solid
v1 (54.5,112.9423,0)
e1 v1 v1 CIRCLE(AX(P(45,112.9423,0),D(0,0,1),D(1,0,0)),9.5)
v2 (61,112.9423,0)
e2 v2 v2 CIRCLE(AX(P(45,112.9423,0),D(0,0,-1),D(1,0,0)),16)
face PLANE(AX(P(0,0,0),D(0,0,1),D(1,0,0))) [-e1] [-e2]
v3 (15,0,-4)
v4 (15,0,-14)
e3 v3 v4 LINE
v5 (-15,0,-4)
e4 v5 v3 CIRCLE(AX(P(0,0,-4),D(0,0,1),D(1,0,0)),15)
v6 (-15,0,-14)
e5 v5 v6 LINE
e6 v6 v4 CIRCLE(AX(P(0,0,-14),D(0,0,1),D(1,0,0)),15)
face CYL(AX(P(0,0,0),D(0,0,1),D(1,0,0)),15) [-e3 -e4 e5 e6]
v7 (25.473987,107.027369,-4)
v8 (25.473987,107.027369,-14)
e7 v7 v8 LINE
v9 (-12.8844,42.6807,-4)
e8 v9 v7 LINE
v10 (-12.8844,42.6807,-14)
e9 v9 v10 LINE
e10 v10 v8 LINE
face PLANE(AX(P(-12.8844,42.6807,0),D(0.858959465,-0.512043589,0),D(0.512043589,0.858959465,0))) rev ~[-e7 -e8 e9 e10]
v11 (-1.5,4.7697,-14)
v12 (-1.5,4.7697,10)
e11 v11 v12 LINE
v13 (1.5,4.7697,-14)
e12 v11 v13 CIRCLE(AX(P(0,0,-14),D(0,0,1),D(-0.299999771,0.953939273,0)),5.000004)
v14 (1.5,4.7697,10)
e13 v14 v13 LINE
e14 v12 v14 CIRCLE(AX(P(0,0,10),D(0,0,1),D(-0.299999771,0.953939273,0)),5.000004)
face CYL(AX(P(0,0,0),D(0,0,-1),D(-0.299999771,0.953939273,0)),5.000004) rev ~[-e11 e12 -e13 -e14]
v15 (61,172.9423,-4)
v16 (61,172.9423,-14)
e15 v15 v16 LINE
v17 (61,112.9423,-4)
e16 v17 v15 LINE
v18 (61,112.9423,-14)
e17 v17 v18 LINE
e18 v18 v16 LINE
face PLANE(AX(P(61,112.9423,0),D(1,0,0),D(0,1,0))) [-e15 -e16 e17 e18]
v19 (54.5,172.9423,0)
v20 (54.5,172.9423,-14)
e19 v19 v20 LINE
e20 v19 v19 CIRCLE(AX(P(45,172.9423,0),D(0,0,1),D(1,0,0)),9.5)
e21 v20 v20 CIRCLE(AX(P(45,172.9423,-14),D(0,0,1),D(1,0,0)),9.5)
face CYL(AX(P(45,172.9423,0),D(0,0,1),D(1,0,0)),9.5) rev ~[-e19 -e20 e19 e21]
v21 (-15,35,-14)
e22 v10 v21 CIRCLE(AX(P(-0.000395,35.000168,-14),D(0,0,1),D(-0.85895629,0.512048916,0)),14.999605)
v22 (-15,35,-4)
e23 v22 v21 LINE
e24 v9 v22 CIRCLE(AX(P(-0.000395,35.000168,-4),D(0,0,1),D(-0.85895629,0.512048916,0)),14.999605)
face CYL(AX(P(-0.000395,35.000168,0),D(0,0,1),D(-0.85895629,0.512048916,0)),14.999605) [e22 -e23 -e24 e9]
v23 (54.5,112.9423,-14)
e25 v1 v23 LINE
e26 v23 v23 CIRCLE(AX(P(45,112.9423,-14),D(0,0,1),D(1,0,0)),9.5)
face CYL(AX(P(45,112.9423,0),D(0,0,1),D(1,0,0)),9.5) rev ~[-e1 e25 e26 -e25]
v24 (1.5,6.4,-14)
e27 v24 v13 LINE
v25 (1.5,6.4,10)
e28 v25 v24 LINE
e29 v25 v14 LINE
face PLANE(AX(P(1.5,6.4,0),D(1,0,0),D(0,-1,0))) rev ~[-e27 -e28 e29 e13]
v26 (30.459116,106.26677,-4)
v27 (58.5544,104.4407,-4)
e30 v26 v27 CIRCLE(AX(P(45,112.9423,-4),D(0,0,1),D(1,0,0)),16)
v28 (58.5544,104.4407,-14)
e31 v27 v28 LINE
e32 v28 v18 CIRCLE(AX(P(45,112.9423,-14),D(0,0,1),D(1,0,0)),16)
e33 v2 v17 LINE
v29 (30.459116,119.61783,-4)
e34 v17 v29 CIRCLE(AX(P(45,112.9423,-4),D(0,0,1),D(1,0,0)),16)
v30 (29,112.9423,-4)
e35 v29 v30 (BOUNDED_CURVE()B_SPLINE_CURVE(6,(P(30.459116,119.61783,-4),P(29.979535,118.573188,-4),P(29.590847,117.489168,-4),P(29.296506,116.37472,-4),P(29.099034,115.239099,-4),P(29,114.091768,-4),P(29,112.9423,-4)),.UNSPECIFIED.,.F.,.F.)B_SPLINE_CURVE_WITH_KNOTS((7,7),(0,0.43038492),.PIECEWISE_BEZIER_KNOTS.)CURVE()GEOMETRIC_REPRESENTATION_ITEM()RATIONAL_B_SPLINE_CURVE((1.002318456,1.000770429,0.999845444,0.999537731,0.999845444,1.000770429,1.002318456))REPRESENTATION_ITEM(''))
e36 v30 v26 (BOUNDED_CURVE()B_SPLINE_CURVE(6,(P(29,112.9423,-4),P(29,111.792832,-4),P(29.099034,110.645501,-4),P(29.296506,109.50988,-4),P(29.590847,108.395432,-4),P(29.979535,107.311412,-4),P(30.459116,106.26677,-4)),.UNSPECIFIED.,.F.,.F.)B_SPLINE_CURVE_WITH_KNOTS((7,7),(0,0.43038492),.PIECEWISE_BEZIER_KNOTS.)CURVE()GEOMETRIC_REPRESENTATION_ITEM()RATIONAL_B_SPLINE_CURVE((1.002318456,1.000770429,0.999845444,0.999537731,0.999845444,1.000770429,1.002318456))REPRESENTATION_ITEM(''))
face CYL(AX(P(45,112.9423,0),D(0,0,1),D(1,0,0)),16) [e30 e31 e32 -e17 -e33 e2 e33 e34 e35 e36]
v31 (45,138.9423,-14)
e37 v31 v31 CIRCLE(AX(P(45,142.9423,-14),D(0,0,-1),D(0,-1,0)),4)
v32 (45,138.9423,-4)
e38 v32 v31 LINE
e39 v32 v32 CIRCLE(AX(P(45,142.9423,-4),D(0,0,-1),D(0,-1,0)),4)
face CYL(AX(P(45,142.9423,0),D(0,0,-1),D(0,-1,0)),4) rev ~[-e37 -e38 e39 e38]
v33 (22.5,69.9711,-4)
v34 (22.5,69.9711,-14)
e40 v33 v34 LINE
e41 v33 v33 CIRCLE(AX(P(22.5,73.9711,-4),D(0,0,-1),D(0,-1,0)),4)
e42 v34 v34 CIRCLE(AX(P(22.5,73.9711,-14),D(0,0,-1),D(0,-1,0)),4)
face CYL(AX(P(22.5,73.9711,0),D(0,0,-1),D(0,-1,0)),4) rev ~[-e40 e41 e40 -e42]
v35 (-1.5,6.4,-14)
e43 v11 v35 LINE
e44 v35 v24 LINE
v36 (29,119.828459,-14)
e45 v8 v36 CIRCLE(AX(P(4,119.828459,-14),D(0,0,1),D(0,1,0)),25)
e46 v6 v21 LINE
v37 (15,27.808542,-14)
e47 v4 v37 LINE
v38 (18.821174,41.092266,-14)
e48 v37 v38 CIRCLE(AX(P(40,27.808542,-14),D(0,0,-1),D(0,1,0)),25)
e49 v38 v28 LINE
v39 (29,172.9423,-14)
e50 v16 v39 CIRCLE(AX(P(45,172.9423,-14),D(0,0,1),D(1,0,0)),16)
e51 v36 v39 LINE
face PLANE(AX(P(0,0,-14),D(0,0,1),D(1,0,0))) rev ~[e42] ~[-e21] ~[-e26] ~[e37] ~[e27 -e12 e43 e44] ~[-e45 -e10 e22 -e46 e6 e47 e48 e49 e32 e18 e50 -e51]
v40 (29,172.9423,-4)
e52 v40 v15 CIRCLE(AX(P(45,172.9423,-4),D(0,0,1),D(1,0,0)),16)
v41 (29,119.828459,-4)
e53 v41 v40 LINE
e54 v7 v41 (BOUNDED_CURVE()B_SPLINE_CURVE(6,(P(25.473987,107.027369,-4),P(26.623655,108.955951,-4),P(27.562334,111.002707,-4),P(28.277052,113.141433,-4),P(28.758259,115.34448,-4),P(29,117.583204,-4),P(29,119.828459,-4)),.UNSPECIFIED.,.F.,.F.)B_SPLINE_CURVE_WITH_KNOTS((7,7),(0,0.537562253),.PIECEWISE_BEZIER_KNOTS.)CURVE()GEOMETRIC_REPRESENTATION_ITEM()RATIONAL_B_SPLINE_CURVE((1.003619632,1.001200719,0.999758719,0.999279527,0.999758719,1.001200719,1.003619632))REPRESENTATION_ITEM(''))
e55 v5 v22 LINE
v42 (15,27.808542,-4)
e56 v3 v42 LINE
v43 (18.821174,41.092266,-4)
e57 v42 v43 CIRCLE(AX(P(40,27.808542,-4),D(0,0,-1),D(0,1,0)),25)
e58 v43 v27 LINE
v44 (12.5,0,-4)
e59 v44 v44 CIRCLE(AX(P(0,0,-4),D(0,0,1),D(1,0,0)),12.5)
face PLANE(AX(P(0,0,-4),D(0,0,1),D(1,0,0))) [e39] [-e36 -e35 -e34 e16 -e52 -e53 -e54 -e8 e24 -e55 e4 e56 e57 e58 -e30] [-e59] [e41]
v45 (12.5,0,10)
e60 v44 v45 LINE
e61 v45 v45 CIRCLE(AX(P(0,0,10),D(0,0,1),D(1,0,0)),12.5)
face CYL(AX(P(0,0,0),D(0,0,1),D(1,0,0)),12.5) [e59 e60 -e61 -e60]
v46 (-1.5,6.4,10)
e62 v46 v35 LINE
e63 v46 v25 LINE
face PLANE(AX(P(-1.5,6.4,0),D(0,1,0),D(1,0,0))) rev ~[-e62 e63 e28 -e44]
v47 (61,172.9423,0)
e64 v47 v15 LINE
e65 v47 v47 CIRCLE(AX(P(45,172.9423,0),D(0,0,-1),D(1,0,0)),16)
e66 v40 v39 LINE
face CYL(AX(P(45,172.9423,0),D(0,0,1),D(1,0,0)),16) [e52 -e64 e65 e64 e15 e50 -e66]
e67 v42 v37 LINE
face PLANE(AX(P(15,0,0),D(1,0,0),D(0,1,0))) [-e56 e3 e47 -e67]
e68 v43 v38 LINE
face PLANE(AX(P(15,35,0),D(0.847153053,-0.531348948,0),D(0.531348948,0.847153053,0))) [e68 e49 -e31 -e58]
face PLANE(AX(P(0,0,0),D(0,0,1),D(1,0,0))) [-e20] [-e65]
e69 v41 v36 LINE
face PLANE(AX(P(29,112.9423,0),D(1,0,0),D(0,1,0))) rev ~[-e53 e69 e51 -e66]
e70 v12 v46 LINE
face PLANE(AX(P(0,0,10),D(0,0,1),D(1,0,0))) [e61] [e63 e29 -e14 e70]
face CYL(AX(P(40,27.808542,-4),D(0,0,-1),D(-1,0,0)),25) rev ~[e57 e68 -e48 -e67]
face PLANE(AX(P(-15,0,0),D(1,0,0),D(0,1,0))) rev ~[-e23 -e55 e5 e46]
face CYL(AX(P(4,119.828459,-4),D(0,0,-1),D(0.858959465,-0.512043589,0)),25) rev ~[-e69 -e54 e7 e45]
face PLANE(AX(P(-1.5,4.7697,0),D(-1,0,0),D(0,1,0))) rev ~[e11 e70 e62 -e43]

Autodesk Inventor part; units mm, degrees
ref_plane "YZ Plane" through (0, 0, 0) normal (1, 0, 0) x (0, 1, 0)
ref_plane "XZ Plane" through (0, 0, 0) normal (0, 1, 0) x (-1, 0, 0)
sketch "Skizze1" plane through (0, 0, 0) normal (0, 0, 1) x (1, 0, 0)
  arc A0 (-1.5, 4.7697) -> (1.5, 4.7697) centre (0, 0) ccw
  circle A1 centre (0, 0) radius 12.5
  line L0 (-30.9429, 0) -> (77.0229, 0) construction
  circle A2 centre (0, 0) radius 15
  circle A3 centre (45, 112.9423) radius 16
  line L1 (61, 112.9423) -> (61, 172.9423)
  line L2 (29, 112.9423) -> (29, 172.9423)
  line L3 (45, 112.9423) -> (45, 188.9423) construction
  line L4 (45, 112.9423) -> (45, 128.9423) construction
  line L5 (29, 112.9423) -> (61, 112.9423) construction
  line L6 (-15, 0) -> (-15, 35)
  line L7 (15, 0) -> (15, 35)
  line L8 (-15, 35) -> (15, 35) construction
  circle A4 centre (0, 35) radius 15 construction
  line L9 (-12.8844, 42.6807) -> (29, 112.9423)
  arc A5 (-12.8844, 42.6807) -> (-15, 35) centre (0, 35) ccw
  line L10 (15, 35) -> (58.5544, 104.4407)
  arc A6 (58.5544, 104.4407) -> (61, 112.9423) centre (45, 112.9423) ccw
  line L11 (0, 35) -> (45, 112.9423) construction
  circle A7 centre (45, 172.9423) radius 16
  circle A8 centre (45, 172.9423) radius 9.5
  circle A9 centre (45, 112.9423) radius 9.5
  line L12 (-1.5, 6.4) -> (1.5, 6.4)
  line L13 (1.5, 6.4) -> (1.5, 4.7697)
  line L14 (-1.5, 4.7697) -> (-1.5, 6.4)
  line L15 (0, 0) -> (0, 5) construction
  line L16 (0, 5) -> (1.5, 5) construction
  circle A10 centre (45, 112.9423) radius 12.75 construction
  circle A11 centre (45, 172.9423) radius 12.75 construction
  point P0 (22.5, 73.9711)
  point P1 (45, 142.9423)
  point P2 (-13, 0)
  point P3 (13, 0)
  point P4 (0, 6.4)
  point P5 (45, 125.6923)
  point P6 (33.9582, 106.5673)
  point P7 (56.0418, 106.5673)
  point P8 (45, 185.6923)
  point P9 (33.9582, 166.5673)
  point P10 (56.0418, 166.5673)
  dimension "d69" = 25.5
  dimension "ParallelHebel_Passflansch_HoleDia" = 25.5
  dimension "d0" = 10
  dimension "d1" = 25
  dimension "d4" = 30
  dimension "d36" = 0
  dimension "ParallelHebel_Gabelgelenk_OuterDia" = 32
  dimension "d38" = 60
  dimension "d39" = 35
  dimension "d40" = 90
  dimension "d41" = 60
  dimension "d42" = 45
  dimension "d43" = 19
  dimension "Nadellager_OuterDia" = 19
  dimension "d45" = 30
  dimension "d51" = 3
  dimension "d52" = 1.4
  dimension "d67" = 360
  dimension "d72" = 360
extrude "Extrusion1" add sketch "Skizze1" along normal blind 10 contours A1
extrude "Extrusion2" add sketch "Skizze1" against normal blind 14 contours A1 | A2 | A2 L6 A5 L9 A3 L10 L7 | A3 | L2 A7 L1 A3 | A7
extrude "Extrusion4" cut sketch "Skizze1" against normal blind 4 contours A2 | A2 L6 A5 L9 A3 L10 L7 | L2 A7 L1 A3
fillet "Rundung1" radius 25 3 edges at (29, 112.9423, -2) (29, 112.9423, -9) (15, 35, -9)
hole "Bohrung2" at (45, 142.9423, 0) at (22.5, 73.9711, 0) direction (0, 0, -1) diameter 8 end through all
ref_plane "Arbeitsebene1" through (45, 112.9423, 0) normal (1, 0, 0) x (0, 0, -1)
equation "\"NKX_10_RiadialPart_Dia\" = 19"
properties part number "ParallelSystem_ProximalPart_Driven_Counterpart_v2.1_AxialNadellager" material "Edelstahl"
